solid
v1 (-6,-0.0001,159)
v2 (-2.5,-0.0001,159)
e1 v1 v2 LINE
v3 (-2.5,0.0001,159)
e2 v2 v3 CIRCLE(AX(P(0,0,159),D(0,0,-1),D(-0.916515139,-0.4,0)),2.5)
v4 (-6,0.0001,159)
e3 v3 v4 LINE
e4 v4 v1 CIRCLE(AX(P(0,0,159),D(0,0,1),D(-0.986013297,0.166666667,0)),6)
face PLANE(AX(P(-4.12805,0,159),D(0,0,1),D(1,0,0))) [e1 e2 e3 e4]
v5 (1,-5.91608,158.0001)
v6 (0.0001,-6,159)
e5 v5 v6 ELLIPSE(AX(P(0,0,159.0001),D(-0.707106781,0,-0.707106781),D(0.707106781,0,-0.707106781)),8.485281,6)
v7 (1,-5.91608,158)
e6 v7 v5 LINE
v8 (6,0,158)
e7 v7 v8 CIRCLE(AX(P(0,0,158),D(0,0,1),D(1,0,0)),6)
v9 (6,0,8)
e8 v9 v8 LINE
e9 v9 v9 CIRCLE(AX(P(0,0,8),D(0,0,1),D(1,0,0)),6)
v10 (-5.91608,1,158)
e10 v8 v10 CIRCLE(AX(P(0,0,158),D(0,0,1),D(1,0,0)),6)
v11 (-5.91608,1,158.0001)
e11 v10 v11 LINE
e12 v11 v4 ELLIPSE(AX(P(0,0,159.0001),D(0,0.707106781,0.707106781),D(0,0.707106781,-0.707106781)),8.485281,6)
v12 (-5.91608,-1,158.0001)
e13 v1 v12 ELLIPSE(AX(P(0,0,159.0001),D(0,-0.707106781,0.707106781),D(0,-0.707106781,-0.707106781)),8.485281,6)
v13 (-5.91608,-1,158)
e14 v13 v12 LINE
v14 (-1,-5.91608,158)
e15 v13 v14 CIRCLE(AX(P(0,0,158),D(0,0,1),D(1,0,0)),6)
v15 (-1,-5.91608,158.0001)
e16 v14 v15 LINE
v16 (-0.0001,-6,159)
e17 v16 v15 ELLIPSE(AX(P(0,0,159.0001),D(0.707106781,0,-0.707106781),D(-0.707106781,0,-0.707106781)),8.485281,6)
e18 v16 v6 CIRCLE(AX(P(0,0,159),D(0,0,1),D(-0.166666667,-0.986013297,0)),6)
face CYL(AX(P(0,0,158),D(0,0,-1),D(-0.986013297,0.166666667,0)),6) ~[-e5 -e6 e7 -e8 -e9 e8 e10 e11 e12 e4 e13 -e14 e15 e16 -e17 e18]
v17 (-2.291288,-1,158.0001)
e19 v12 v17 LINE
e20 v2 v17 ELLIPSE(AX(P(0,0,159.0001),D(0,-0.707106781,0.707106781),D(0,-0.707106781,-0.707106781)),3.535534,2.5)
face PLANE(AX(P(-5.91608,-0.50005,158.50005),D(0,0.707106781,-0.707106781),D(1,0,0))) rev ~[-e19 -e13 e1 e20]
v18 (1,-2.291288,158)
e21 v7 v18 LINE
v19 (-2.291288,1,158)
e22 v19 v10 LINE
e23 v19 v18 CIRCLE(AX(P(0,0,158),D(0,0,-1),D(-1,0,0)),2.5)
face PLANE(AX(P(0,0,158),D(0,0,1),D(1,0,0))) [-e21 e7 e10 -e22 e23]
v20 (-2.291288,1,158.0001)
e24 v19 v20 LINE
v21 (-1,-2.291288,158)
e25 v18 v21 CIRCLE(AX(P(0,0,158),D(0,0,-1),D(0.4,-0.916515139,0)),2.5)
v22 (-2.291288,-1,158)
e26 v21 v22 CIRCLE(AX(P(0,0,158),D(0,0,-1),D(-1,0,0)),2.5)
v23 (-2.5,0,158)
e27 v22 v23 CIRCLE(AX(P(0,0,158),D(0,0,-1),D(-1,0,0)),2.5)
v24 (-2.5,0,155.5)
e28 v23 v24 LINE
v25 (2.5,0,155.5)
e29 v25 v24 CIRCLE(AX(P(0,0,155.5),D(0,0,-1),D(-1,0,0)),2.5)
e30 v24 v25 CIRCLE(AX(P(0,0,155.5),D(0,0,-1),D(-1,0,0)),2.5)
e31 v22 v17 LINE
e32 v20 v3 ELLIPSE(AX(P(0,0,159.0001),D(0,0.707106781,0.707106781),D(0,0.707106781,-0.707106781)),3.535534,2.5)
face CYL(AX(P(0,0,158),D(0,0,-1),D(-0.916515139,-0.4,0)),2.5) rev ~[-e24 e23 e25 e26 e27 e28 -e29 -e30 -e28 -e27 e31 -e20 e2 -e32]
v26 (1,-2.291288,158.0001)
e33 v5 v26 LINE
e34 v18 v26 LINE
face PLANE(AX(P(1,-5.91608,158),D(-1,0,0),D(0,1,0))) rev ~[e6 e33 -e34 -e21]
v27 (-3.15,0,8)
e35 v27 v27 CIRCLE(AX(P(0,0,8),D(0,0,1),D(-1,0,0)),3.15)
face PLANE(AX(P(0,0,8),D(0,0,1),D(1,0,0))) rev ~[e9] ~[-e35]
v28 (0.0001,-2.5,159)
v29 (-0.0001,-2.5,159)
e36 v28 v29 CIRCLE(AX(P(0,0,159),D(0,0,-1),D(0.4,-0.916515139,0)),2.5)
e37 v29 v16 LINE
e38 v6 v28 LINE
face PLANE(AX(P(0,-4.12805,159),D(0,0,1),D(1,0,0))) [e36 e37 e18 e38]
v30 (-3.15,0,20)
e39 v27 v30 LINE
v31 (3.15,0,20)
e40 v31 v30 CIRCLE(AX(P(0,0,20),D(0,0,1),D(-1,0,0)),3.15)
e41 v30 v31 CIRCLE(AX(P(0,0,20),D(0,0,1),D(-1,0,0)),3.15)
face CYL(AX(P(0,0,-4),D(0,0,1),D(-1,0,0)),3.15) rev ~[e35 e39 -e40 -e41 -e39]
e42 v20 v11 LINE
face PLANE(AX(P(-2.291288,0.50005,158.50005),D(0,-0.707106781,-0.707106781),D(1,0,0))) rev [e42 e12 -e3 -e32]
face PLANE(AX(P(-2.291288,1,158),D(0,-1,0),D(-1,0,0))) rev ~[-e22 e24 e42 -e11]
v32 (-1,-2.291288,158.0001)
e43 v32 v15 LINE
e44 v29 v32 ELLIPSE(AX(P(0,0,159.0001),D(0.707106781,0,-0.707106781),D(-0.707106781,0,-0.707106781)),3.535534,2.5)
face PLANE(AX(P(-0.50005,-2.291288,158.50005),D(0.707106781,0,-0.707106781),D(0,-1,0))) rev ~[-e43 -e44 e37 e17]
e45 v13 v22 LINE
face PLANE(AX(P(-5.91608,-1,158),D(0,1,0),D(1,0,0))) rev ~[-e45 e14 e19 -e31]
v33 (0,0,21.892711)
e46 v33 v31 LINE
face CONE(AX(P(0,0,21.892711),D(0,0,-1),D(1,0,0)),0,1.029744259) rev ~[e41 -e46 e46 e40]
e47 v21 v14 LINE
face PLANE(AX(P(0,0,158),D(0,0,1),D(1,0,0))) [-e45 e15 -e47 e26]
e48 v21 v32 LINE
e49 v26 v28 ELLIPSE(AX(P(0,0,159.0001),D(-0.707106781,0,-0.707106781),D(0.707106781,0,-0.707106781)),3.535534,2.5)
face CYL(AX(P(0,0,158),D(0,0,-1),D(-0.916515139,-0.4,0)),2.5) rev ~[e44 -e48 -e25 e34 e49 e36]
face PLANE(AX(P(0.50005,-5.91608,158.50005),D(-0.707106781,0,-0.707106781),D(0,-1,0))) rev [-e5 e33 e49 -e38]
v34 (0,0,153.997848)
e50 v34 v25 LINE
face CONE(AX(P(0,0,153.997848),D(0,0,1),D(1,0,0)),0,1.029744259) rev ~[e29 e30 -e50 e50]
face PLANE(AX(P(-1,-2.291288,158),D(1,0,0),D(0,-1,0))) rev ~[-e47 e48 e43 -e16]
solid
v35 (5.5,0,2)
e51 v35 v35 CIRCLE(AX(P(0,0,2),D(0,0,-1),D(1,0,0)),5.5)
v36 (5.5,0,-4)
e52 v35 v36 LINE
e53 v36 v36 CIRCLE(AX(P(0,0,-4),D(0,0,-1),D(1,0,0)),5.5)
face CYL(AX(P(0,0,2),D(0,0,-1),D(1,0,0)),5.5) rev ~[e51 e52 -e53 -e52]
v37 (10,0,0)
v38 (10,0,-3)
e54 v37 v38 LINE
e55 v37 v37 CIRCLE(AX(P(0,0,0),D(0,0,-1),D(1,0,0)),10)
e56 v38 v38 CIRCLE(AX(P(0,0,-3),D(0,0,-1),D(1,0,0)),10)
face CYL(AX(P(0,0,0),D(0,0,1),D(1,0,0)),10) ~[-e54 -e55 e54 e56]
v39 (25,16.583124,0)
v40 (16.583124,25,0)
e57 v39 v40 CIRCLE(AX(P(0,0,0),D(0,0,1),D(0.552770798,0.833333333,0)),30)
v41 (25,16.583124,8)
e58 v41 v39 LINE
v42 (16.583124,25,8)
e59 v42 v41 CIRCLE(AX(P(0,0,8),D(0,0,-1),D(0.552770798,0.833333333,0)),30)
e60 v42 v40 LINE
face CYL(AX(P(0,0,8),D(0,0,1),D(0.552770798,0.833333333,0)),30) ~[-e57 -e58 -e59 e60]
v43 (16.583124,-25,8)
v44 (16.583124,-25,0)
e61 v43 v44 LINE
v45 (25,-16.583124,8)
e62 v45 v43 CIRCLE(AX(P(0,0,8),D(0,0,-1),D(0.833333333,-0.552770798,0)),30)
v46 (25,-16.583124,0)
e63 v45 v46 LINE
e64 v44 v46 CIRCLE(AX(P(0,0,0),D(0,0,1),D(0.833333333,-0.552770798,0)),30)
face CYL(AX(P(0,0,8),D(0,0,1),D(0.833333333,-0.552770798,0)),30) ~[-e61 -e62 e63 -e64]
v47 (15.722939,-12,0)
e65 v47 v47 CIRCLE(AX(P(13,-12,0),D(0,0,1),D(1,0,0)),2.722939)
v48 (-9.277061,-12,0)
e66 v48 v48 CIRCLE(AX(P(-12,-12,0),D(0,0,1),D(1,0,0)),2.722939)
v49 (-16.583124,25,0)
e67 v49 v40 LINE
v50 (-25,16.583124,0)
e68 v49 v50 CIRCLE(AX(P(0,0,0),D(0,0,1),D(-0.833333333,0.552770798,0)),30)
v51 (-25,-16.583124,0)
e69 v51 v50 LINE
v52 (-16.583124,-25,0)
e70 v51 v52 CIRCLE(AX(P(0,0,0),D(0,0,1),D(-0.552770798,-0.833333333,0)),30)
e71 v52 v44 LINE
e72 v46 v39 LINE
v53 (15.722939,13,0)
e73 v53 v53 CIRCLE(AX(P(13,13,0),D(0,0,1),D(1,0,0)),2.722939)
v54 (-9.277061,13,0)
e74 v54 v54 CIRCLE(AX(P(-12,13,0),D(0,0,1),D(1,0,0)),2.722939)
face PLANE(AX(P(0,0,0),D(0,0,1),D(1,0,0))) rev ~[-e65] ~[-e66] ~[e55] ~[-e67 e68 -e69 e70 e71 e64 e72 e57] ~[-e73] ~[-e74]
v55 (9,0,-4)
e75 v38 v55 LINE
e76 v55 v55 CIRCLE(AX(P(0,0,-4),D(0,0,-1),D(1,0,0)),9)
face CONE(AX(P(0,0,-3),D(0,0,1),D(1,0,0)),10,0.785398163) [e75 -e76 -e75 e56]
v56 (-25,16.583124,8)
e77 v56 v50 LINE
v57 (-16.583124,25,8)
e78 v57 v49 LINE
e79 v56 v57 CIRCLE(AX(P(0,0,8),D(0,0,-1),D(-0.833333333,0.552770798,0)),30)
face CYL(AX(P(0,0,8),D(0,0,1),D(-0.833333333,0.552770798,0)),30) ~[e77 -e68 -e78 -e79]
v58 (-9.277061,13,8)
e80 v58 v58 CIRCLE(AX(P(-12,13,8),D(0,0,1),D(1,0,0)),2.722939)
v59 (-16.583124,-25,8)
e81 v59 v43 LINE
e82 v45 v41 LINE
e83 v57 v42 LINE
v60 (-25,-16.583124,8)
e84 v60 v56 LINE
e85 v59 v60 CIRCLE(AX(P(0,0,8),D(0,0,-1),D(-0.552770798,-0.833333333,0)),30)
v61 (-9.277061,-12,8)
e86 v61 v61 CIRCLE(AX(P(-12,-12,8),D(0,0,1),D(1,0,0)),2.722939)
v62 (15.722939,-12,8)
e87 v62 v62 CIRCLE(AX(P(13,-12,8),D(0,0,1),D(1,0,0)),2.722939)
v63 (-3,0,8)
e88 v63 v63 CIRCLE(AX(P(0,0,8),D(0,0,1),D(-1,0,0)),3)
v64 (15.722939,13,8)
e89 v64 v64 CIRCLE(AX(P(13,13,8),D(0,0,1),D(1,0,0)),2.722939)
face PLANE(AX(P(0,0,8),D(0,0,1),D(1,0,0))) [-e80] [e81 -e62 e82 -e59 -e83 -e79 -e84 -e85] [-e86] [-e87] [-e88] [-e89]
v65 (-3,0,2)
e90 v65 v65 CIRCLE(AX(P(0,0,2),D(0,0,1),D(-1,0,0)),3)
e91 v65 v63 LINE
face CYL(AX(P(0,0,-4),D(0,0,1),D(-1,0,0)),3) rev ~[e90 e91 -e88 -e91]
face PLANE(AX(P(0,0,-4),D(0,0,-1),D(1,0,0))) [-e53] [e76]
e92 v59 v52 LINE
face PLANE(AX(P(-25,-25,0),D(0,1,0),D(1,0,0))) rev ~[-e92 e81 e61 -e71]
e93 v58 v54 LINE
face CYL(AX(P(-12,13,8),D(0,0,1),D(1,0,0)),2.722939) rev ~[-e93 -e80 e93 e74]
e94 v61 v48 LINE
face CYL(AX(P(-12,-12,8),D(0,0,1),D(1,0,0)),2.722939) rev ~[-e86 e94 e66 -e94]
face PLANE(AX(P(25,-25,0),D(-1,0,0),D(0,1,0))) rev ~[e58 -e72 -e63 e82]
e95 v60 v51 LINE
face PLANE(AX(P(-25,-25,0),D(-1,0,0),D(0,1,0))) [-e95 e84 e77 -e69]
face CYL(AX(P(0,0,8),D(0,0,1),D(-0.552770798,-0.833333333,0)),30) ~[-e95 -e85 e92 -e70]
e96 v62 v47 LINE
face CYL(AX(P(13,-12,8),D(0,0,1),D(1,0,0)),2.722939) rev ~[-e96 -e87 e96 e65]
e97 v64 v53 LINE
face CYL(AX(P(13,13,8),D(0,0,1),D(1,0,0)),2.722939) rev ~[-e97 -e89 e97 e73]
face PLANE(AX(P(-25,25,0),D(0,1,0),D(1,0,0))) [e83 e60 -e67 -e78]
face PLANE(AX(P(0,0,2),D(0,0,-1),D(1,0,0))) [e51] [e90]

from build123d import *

# Parameters (mm, degrees)
F0_W            = 50
F0_H            = 50
F1_DEPTH        = 8
F2_R            = 10
F3_DEPTH        = 4
F5_DEPTH        = 25
F4_R            = 6
F6_DEPTH        = 150
F7_R            = 2.7229388177
F8_DEPTH        = 25
F9_SIZE         = 1
F11_D           = 6
F11_CBORE_D     = 11
F11_CBORE_DEPTH = 6
F12_D           = 6.3
F12_DEPTH       = 12
F12_TIP         = 1.8927109499
F14_D           = 5
F14_DEPTH       = 2.5
F14_TIP         = 1.5021515476
F16_DEPTH       = 1
F17_SIZE        = 0.9999


# Not quite as in the source:
# - a fillet or chamfer is up to 0.001 mm smaller than in the source, because OpenCascade refuses the exact size


with BuildPart() as f1:
    # F0 (on Top) → F1 (new body)
    with BuildSketch(Plane.XY):
        Rectangle(F0_W, F0_H)
    extrude(amount=F1_DEPTH)

    # F2 (on face) → F3 (join)
    with BuildSketch(Plane(origin=(0, 0, 0), x_dir=(1, 0, 0), z_dir=(0, 0, -1))):
        Circle(F2_R)
    extrude(amount=F3_DEPTH)

    # F4 (on face) → F5 (cut)
    with BuildSketch(Plane.XY.offset(8)):
        with BuildLine():
            ThreePointArc((16.5831239518, 25), (21.2132034356, 21.2132034356), (25, 16.5831239518))
            Line((25, 16.5831239518), (25, 25))
            Line((25, 25), (16.5831239518, 25))
        make_face()
        with BuildLine():
            Line((25, -25), (25, -16.5831239518))
            ThreePointArc((25, -16.5831239518), (21.2132034356, -21.2132034356), (16.5831239518, -25))
            Line((16.5831239518, -25), (25, -25))
        make_face()
        with BuildLine():
            ThreePointArc((-16.5831239518, -25), (0, -30), (16.5831239518, -25))
            Line((16.5831239518, -25), (-16.5831239518, -25))
        make_face()
        with BuildLine():
            ThreePointArc((-25, 16.5831239518), (-21.2132034356, 21.2132034356), (-16.5831239518, 25))
            Line((-16.5831239518, 25), (-25, 25))
            Line((-25, 25), (-25, 16.5831239518))
        make_face()
        with BuildLine():
            Line((-25, -25), (-16.5831239518, -25))
            ThreePointArc((-16.5831239518, -25), (-21.2132034356, -21.2132034356), (-25, -16.5831239518))
            Line((-25, -16.5831239518), (-25, -25))
        make_face()
        with BuildLine():
            Line((-25, -16.5831239518), (-25, 16.5831239518))
            ThreePointArc((-25, 16.5831239518), (-30, 0), (-25, -16.5831239518))
        make_face()
    extrude(amount=-F5_DEPTH, mode=Mode.SUBTRACT)

    # F7 (on face) → F8 (cut)
    with BuildSketch(Plane.XY.offset(8)):
        with Locations((13, 13)):
            Circle(F7_R)
        with Locations((13, -12)):
            Circle(F7_R)
        with Locations((-12, -12)):
            Circle(F7_R)
        with Locations((-12, 13)):
            Circle(F7_R)
    extrude(amount=-F8_DEPTH, mode=Mode.SUBTRACT)

    # F9
    f9_edges = [f1.edges().sort_by_distance(p)[0] for p in [
        (-10, 0, -4),
    ]]
    chamfer(f9_edges, length=F9_SIZE)

    # F11 (through all)
    with Locations(Plane(origin=(0, 0, -4), x_dir=(1, 0, 0), z_dir=(0, 0, -1))):
        with Locations((0, 0)):
            CounterBoreHole(F11_D / 2, F11_CBORE_D / 2, F11_CBORE_DEPTH)


with BuildPart() as f6:
    # F4 (on face) → F6 (new body)
    with BuildSketch(Plane.XY.offset(8)):
        Circle(F4_R)
    extrude(amount=F6_DEPTH)

    # F12
    with Locations(Plane(origin=(0, 0, 8), x_dir=(1, 0, 0), z_dir=(0, 0, -1))):
        with Locations((0, 0)):
            Hole(F12_D / 2, depth=F12_DEPTH)
            with Locations((0, 0, -(F12_DEPTH + F12_TIP / 2))):  # 118° drill point
                Cone(0, F12_D / 2, F12_TIP, mode=Mode.SUBTRACT)

    # F14
    with Locations(Plane.XY.offset(158)):
        with Locations((0, 0)):
            Hole(F14_D / 2, depth=F14_DEPTH)
            with Locations((0, 0, -(F14_DEPTH + F14_TIP / 2))):  # 118° drill point
                Cone(0, F14_D / 2, F14_TIP, mode=Mode.SUBTRACT)

    # F15 (on face) → F16 (join)
    with BuildSketch(Plane.XY.offset(158)):
        with BuildLine():
            Line((-2.2912878475, 1), (-5.9160797831, 1))
            ThreePointArc((-5.9160797831, 1), (-6, 0), (-5.9160797831, -1))
            Line((-5.9160797831, -1), (-2.2912878475, -1))
            ThreePointArc((-2.2912878475, -1), (-2.5, 0), (-2.2912878475, 1))
        make_face()
        with BuildLine():
            ThreePointArc((-1, -5.9160797831), (0, -6), (1, -5.9160797831))
            Line((1, -5.9160797831), (1, -2.2912878475))
            ThreePointArc((1, -2.2912878475), (0, -2.5), (-1, -2.2912878475))
            Line((-1, -2.2912878475), (-1, -5.9160797831))
        make_face()
    extrude(amount=F16_DEPTH)

    # F17 (size 1 in the source; OpenCascade refuses exactly that, so slightly less here)
    f17_edges = [f6.edges().sort_by_distance(p)[0] for p in [
        (-4.103684, -1, 159),
        (-1, -4.103684, 159),
        (1, -4.103684, 159),
        (-4.103684, 1, 159),
    ]]
    chamfer(f17_edges, length=F17_SIZE)


solid = Compound([f1.part, f6.part])
